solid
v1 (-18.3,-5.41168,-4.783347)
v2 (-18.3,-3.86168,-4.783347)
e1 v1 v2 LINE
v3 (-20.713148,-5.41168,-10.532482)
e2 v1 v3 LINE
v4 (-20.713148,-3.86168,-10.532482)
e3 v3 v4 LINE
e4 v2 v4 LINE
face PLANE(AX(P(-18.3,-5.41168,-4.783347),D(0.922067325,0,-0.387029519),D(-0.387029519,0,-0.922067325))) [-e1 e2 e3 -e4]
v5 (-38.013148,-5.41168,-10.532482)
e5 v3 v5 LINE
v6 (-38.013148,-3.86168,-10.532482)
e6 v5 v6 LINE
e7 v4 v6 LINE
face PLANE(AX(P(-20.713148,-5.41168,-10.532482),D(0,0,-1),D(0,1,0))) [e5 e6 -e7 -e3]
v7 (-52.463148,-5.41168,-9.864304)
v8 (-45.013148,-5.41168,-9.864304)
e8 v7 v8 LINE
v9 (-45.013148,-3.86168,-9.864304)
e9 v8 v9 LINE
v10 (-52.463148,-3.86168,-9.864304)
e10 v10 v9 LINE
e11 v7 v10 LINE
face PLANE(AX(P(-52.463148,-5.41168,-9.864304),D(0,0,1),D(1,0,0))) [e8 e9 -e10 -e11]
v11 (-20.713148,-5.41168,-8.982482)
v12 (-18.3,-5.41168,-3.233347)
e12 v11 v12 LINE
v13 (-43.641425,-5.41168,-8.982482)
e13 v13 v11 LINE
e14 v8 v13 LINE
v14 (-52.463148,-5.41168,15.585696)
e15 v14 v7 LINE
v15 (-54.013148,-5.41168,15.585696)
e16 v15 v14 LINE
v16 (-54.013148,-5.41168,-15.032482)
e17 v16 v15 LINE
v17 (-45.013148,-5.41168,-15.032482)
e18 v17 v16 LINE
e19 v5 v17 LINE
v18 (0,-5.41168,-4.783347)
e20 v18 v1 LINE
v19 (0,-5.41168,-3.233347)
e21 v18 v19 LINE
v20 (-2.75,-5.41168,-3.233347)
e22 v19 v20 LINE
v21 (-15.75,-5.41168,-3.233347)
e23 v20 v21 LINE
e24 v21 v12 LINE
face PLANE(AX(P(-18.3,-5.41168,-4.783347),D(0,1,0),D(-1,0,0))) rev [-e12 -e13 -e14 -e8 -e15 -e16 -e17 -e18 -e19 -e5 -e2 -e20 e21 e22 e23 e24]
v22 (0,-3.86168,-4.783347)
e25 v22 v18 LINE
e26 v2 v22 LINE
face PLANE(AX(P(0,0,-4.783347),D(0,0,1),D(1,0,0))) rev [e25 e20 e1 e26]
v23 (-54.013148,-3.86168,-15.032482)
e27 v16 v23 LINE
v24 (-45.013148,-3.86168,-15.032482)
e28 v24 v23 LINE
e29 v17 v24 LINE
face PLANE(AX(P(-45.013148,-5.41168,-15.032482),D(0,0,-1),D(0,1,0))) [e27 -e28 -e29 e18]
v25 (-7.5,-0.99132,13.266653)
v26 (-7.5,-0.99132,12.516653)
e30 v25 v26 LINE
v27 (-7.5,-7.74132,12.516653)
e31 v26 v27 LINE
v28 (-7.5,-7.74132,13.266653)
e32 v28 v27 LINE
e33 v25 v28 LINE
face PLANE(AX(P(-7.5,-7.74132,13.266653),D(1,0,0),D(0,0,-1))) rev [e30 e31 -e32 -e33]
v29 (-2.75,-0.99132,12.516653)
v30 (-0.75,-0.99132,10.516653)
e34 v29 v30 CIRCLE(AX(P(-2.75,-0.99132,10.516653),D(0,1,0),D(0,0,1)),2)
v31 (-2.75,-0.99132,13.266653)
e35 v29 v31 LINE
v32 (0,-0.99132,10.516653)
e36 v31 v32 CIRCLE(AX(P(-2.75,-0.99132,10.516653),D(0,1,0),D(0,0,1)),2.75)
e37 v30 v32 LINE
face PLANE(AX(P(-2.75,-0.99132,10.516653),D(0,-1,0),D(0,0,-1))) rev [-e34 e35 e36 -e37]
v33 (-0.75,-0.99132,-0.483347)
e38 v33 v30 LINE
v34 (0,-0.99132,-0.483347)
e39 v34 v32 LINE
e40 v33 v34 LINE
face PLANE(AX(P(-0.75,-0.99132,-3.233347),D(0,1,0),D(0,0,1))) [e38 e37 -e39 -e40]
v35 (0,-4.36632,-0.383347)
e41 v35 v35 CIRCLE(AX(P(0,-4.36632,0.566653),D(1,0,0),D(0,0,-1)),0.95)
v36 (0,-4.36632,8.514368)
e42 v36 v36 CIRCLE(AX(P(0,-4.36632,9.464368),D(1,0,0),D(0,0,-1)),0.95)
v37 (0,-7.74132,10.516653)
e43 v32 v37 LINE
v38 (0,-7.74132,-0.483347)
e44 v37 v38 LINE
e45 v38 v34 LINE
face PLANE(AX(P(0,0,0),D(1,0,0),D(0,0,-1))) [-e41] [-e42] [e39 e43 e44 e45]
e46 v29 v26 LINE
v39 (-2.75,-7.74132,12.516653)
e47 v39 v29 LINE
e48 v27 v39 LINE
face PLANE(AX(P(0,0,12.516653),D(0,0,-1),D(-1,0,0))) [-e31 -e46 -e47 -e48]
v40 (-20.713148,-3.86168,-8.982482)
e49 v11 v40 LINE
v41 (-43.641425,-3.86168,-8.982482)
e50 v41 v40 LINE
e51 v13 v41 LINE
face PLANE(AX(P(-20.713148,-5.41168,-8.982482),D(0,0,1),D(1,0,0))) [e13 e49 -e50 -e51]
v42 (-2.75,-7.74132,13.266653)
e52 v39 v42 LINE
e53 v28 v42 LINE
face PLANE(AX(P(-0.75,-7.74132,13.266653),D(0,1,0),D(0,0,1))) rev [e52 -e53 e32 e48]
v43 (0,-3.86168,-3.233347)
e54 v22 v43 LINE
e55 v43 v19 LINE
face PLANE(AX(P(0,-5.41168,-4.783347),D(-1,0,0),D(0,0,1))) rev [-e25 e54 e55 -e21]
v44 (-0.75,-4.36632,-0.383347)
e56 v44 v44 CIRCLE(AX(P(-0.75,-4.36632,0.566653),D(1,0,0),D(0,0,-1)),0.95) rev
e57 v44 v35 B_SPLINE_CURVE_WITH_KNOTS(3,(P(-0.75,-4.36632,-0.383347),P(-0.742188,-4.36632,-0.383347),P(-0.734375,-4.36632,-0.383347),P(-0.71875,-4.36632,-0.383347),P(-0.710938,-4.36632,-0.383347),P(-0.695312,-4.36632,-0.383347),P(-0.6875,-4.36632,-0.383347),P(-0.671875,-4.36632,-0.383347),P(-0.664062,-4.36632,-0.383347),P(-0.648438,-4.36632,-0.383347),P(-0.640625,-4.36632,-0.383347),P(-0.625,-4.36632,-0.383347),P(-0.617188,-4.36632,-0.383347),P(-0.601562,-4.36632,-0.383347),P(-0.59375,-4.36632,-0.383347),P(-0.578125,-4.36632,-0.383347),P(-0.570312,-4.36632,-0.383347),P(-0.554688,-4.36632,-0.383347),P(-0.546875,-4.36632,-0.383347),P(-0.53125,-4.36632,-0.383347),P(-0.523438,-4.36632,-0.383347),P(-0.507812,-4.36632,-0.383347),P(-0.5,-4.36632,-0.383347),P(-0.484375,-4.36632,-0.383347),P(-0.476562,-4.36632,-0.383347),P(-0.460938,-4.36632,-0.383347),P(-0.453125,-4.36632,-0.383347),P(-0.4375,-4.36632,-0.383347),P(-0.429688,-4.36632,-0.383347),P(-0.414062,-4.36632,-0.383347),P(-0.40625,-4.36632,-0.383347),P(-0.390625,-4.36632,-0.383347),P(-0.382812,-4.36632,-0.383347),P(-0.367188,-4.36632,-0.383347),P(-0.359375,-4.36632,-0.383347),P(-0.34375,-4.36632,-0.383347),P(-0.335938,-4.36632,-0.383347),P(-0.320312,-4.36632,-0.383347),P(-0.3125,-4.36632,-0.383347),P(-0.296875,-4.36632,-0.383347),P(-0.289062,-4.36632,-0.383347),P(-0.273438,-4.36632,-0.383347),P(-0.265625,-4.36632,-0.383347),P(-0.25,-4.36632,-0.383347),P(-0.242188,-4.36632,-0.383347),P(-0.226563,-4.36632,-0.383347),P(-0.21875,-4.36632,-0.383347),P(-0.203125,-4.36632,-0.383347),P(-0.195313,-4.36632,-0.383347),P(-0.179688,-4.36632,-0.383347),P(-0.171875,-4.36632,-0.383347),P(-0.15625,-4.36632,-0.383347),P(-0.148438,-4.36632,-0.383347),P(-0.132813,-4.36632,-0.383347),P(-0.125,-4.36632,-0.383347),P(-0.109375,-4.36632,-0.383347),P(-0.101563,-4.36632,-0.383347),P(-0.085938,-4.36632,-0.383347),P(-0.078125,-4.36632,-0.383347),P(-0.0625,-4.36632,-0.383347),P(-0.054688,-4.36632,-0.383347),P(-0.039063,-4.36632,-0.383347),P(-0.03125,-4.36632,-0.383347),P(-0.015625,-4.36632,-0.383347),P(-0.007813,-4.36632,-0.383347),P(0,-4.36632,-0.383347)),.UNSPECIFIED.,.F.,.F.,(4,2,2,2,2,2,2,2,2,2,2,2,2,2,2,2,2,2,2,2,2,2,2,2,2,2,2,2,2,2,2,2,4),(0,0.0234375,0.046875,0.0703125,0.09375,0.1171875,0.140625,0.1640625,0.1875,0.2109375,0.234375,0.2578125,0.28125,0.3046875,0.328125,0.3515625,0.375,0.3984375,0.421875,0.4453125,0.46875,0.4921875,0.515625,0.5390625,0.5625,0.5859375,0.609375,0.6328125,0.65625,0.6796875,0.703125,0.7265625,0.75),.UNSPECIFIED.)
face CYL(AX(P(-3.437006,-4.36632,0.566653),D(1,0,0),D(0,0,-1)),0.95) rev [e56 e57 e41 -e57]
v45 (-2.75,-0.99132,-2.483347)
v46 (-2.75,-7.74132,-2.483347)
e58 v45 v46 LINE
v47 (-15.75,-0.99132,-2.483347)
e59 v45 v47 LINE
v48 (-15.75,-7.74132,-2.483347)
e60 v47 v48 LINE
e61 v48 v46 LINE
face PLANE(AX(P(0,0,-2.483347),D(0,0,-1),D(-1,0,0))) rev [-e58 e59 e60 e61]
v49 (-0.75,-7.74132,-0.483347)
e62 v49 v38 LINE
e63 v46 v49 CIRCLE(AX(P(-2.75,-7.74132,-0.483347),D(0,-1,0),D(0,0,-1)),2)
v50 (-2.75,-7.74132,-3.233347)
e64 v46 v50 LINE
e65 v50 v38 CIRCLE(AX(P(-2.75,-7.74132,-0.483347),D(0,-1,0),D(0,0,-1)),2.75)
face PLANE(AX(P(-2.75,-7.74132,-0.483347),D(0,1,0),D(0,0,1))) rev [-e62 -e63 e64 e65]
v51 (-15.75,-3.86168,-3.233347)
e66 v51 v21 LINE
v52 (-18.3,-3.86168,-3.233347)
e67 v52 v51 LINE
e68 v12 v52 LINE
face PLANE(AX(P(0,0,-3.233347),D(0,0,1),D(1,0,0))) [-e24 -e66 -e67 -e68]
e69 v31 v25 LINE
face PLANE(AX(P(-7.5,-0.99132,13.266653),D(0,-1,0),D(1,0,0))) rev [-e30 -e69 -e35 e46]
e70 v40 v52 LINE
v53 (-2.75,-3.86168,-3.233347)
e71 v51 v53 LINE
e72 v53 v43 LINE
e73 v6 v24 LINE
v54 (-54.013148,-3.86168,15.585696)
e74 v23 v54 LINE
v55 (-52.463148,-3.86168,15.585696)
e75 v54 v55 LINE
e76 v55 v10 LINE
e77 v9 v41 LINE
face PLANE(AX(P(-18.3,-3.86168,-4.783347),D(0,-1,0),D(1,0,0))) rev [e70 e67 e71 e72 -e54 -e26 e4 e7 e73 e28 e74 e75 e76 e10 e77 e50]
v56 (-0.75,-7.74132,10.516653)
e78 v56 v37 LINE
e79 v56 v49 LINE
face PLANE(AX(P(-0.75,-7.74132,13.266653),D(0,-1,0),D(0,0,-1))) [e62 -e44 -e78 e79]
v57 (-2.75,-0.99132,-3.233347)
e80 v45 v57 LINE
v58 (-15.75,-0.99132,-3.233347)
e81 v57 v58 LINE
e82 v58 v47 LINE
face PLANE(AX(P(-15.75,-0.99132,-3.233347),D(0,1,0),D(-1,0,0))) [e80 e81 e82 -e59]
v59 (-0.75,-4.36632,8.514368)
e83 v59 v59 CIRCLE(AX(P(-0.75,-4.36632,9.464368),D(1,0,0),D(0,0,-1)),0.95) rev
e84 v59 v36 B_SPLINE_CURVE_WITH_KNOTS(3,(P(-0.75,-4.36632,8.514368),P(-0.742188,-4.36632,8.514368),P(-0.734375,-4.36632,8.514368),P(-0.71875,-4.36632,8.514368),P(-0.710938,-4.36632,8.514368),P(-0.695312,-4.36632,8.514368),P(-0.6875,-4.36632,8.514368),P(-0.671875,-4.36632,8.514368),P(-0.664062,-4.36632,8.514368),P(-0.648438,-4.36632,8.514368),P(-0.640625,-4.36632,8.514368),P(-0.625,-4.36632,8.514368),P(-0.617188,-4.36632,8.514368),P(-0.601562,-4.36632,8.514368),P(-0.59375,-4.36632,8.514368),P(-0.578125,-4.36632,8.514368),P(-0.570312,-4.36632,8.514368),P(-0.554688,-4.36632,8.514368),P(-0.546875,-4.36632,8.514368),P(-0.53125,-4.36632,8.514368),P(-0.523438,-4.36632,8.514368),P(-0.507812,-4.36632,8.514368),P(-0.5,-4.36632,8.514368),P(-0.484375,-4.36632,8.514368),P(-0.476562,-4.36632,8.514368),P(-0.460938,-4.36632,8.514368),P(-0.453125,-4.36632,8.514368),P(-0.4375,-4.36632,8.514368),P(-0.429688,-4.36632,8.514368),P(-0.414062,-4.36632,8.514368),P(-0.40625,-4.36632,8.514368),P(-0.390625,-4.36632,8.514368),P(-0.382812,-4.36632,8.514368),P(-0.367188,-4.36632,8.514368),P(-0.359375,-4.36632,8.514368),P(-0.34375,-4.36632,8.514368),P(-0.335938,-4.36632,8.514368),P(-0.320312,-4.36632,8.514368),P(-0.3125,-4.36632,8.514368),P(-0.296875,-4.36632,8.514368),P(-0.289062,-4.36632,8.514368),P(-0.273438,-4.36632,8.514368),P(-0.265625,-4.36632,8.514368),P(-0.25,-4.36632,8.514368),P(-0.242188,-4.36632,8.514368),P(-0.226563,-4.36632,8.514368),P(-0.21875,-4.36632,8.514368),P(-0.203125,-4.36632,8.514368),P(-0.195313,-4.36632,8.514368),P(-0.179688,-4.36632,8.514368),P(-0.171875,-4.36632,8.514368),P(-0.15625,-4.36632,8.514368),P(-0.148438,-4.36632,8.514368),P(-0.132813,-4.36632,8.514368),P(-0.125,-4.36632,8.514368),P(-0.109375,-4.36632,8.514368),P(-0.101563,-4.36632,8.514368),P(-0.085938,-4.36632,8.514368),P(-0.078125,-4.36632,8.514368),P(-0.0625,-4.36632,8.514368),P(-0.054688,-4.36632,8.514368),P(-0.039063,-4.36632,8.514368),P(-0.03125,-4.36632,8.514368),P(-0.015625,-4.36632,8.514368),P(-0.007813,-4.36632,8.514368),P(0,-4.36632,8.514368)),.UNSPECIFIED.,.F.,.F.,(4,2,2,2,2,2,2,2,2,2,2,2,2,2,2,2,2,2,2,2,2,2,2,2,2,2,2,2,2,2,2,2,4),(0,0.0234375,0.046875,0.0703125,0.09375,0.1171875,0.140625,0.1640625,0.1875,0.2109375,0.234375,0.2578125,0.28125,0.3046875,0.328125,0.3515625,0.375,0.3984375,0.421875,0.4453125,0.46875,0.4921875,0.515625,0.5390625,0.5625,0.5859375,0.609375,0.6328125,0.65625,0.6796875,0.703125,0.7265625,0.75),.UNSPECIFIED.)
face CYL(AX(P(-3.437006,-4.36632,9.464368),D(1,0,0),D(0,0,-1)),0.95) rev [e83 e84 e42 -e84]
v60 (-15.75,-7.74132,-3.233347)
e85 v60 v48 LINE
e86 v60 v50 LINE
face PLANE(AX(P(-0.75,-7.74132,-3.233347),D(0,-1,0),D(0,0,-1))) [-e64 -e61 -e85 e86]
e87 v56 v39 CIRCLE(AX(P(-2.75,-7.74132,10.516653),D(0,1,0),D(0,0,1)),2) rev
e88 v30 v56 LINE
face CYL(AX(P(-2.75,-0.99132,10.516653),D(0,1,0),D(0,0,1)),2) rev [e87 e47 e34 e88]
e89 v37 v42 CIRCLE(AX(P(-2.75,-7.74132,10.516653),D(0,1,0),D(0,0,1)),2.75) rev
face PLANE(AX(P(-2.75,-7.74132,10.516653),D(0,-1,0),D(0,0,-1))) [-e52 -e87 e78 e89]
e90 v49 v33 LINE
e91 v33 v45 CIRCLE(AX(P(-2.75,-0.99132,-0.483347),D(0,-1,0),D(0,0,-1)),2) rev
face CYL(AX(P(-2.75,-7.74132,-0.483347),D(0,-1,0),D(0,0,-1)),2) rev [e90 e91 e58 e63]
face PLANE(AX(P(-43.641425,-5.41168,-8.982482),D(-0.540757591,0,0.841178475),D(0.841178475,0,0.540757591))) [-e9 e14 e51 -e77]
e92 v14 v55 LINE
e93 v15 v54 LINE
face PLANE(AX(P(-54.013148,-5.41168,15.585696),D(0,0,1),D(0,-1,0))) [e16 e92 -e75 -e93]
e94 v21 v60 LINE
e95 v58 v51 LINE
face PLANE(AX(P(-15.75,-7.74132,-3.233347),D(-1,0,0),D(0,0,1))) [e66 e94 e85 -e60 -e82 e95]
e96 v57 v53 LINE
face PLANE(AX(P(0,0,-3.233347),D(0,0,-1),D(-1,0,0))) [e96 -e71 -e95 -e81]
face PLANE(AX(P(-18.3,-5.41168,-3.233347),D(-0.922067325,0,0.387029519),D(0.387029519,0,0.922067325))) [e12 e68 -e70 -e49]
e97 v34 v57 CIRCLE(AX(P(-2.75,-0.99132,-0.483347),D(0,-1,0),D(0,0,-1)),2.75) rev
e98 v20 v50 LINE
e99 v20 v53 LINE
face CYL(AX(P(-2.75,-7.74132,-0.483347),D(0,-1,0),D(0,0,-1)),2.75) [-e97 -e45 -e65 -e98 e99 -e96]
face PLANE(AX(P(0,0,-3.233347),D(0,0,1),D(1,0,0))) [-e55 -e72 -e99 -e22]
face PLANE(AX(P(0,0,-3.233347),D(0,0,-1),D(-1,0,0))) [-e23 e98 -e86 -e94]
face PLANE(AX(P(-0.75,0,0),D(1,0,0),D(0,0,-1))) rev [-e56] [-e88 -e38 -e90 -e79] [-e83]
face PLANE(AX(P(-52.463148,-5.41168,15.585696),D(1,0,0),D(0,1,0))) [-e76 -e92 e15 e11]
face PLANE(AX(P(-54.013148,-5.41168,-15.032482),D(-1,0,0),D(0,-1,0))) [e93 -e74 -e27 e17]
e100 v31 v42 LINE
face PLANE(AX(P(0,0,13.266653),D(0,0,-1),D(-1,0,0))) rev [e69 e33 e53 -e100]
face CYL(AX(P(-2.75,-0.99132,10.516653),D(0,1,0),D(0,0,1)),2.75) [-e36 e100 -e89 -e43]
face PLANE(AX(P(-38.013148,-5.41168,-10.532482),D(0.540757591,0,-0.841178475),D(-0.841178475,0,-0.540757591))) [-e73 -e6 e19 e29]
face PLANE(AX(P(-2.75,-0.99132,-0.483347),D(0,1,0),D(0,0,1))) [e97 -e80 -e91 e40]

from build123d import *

# Parameters (mm, degrees)
SZKIC2_W                           = 16.5
SZKIC2_H                           = 6.75
ODGI_CIE_BAZOWE1_DEPTH             = 0.75
ODGI_CIE_KRAW_DZI1_STRIP_W         = 7
ODGI_CIE_KRAW_DZI1_STRIP_H         = 0.75
ODGI_CIE_KRAW_DZI1_STRIP_CUT_DEPTH = 6.75
ODGI_CIE_KRAW_DZI1_DEPTH           = 6.75
ODGI_CIE_KRAW_DZI2_STRIP_W         = 7
ODGI_CIE_KRAW_DZI2_STRIP_H         = 0.75
ODGI_CIE_KRAW_DZI2_STRIP_CUT_DEPTH = 6.75
ODGI_CIE_KRAW_DZI2_DEPTH           = 6.75
SZKIC16_W                          = 18.3
SZKIC16_H                          = 1.55
DODANIE_WYCI_GNI_CIE2_DEPTH        = 1.55
DODANIE_WYCI_GNI_CIE3_DEPTH        = 1.55
SZKIC19_R                          = 0.95
WYTNIJ_WYCI_GNI_CIE1_DEPTH         = 0.75


# Sheet-metal steps are written as plain solids
with BuildPart() as part:
    # Szkic2 → Odgięcie bazowe1 (new body)
    with BuildSketch(Plane(origin=(0, 0, 0), x_dir=(0, 0, -1), z_dir=(1, 0, 0))):
        with Locations((-5.0166528, -4.366319951)):
            Rectangle(SZKIC2_W, SZKIC2_H)
    extrude(amount=-ODGI_CIE_BAZOWE1_DEPTH)

    # Odgięcie krawędzi1 strip (across the edge) → Odgięcie krawędzi1 strip cut (cut)
    with BuildSketch(Plane(origin=(-0.75, -7.741319951, 13.2666528), x_dir=(0, 0, -1), z_dir=(0, 1, 0))):
        with Locations((-0.75, -0.375)):
            Rectangle(ODGI_CIE_KRAW_DZI1_STRIP_W, ODGI_CIE_KRAW_DZI1_STRIP_H)
    extrude(amount=ODGI_CIE_KRAW_DZI1_STRIP_CUT_DEPTH, mode=Mode.SUBTRACT)

    # Odgięcie krawędzi1 section (across the edge) → Odgięcie krawędzi1 (add)
    with BuildSketch(Plane(origin=(-0.75, -7.741319951, 13.2666528), x_dir=(0, 0, -1), z_dir=(0, 1, 0))):
        with BuildLine():
            Line((0, 2), (0, 6.75))
            Line((0, 6.75), (0.75, 6.75))
            Line((0.75, 6.75), (0.75, 2))
            ThreePointArc((0.75, 2), (1.335786438, 0.585786438), (2.75, 0))
            Line((2.75, 0), (2.75, -0.75))
            ThreePointArc((2.75, -0.75), (0.805456352, 0.055456352), (0, 2))
        make_face()
    extrude(amount=ODGI_CIE_KRAW_DZI1_DEPTH)

    # Odgięcie krawędzi2 strip (across the edge) → Odgięcie krawędzi2 strip cut (cut)
    with BuildSketch(Plane(origin=(-0.75, -0.991319951, -3.2333472), x_dir=(0, 0, 1), z_dir=(0, -1, 0))):
        with Locations((-0.75, -0.375)):
            Rectangle(ODGI_CIE_KRAW_DZI2_STRIP_W, ODGI_CIE_KRAW_DZI2_STRIP_H)
    extrude(amount=ODGI_CIE_KRAW_DZI2_STRIP_CUT_DEPTH, mode=Mode.SUBTRACT)

    # Odgięcie krawędzi2 section (across the edge) → Odgięcie krawędzi2 (add)
    with BuildSketch(Plane(origin=(-0.75, -0.991319951, -3.2333472), x_dir=(0, 0, 1), z_dir=(0, -1, 0))):
        with BuildLine():
            Line((0, 2), (0, 15))
            Line((0, 15), (0.75, 15))
            Line((0.75, 15), (0.75, 2))
            ThreePointArc((0.75, 2), (1.335786438, 0.585786438), (2.75, 0))
            Line((2.75, 0), (2.75, -0.75))
            ThreePointArc((2.75, -0.75), (0.805456352, 0.055456352), (0, 2))
        make_face()
    extrude(amount=ODGI_CIE_KRAW_DZI2_DEPTH)

    # Szkic16 → Dodanie-wyciągnięcie2 (add)
    with BuildSketch(Plane(origin=(0, 0, -3.2333472), x_dir=(-1, 0, 0), z_dir=(0, 0, -1))):
        with Locations((9.15, -4.636679938)):
            Rectangle(SZKIC16_W, SZKIC16_H)
    extrude(amount=DODANIE_WYCI_GNI_CIE2_DEPTH)

    # Szkic18 → Dodanie-wyciągnięcie3 (add)
    with BuildSketch(Plane(origin=(0, -3.861679938, 0), x_dir=(1, 0, 0), z_dir=(0, 1, 0))):
        Polygon((-45.013147785, 15.032481597), (-54.013147785, 15.032481597), (-54.013147785, -15.585696439), (-52.463147785, -15.585696439), (-52.463147785, 9.864303561), (-45.013147785, 9.864303561), (-43.64142473, 8.982481597), (-20.713147785, 8.982481597), (-18.3, 3.2333472), (-18.3, 4.7833472), (-20.713147785, 10.532481597), (-38.013147785, 10.532481597), align=None)
    extrude(amount=-DODANIE_WYCI_GNI_CIE3_DEPTH)

    # Szkic19 → Wytnij-wyciągnięcie1 (cut)
    with BuildSketch(Plane(origin=(0, 0, 0), x_dir=(0, 0, -1), z_dir=(1, 0, 0))):
        with Locations((-0.5666528, -4.366319951)):
            Circle(SZKIC19_R)
        with Locations((-9.464367913, -4.366319951)):
            Circle(SZKIC19_R)
    extrude(amount=-WYTNIJ_WYCI_GNI_CIE1_DEPTH, mode=Mode.SUBTRACT)


solid = part.part
